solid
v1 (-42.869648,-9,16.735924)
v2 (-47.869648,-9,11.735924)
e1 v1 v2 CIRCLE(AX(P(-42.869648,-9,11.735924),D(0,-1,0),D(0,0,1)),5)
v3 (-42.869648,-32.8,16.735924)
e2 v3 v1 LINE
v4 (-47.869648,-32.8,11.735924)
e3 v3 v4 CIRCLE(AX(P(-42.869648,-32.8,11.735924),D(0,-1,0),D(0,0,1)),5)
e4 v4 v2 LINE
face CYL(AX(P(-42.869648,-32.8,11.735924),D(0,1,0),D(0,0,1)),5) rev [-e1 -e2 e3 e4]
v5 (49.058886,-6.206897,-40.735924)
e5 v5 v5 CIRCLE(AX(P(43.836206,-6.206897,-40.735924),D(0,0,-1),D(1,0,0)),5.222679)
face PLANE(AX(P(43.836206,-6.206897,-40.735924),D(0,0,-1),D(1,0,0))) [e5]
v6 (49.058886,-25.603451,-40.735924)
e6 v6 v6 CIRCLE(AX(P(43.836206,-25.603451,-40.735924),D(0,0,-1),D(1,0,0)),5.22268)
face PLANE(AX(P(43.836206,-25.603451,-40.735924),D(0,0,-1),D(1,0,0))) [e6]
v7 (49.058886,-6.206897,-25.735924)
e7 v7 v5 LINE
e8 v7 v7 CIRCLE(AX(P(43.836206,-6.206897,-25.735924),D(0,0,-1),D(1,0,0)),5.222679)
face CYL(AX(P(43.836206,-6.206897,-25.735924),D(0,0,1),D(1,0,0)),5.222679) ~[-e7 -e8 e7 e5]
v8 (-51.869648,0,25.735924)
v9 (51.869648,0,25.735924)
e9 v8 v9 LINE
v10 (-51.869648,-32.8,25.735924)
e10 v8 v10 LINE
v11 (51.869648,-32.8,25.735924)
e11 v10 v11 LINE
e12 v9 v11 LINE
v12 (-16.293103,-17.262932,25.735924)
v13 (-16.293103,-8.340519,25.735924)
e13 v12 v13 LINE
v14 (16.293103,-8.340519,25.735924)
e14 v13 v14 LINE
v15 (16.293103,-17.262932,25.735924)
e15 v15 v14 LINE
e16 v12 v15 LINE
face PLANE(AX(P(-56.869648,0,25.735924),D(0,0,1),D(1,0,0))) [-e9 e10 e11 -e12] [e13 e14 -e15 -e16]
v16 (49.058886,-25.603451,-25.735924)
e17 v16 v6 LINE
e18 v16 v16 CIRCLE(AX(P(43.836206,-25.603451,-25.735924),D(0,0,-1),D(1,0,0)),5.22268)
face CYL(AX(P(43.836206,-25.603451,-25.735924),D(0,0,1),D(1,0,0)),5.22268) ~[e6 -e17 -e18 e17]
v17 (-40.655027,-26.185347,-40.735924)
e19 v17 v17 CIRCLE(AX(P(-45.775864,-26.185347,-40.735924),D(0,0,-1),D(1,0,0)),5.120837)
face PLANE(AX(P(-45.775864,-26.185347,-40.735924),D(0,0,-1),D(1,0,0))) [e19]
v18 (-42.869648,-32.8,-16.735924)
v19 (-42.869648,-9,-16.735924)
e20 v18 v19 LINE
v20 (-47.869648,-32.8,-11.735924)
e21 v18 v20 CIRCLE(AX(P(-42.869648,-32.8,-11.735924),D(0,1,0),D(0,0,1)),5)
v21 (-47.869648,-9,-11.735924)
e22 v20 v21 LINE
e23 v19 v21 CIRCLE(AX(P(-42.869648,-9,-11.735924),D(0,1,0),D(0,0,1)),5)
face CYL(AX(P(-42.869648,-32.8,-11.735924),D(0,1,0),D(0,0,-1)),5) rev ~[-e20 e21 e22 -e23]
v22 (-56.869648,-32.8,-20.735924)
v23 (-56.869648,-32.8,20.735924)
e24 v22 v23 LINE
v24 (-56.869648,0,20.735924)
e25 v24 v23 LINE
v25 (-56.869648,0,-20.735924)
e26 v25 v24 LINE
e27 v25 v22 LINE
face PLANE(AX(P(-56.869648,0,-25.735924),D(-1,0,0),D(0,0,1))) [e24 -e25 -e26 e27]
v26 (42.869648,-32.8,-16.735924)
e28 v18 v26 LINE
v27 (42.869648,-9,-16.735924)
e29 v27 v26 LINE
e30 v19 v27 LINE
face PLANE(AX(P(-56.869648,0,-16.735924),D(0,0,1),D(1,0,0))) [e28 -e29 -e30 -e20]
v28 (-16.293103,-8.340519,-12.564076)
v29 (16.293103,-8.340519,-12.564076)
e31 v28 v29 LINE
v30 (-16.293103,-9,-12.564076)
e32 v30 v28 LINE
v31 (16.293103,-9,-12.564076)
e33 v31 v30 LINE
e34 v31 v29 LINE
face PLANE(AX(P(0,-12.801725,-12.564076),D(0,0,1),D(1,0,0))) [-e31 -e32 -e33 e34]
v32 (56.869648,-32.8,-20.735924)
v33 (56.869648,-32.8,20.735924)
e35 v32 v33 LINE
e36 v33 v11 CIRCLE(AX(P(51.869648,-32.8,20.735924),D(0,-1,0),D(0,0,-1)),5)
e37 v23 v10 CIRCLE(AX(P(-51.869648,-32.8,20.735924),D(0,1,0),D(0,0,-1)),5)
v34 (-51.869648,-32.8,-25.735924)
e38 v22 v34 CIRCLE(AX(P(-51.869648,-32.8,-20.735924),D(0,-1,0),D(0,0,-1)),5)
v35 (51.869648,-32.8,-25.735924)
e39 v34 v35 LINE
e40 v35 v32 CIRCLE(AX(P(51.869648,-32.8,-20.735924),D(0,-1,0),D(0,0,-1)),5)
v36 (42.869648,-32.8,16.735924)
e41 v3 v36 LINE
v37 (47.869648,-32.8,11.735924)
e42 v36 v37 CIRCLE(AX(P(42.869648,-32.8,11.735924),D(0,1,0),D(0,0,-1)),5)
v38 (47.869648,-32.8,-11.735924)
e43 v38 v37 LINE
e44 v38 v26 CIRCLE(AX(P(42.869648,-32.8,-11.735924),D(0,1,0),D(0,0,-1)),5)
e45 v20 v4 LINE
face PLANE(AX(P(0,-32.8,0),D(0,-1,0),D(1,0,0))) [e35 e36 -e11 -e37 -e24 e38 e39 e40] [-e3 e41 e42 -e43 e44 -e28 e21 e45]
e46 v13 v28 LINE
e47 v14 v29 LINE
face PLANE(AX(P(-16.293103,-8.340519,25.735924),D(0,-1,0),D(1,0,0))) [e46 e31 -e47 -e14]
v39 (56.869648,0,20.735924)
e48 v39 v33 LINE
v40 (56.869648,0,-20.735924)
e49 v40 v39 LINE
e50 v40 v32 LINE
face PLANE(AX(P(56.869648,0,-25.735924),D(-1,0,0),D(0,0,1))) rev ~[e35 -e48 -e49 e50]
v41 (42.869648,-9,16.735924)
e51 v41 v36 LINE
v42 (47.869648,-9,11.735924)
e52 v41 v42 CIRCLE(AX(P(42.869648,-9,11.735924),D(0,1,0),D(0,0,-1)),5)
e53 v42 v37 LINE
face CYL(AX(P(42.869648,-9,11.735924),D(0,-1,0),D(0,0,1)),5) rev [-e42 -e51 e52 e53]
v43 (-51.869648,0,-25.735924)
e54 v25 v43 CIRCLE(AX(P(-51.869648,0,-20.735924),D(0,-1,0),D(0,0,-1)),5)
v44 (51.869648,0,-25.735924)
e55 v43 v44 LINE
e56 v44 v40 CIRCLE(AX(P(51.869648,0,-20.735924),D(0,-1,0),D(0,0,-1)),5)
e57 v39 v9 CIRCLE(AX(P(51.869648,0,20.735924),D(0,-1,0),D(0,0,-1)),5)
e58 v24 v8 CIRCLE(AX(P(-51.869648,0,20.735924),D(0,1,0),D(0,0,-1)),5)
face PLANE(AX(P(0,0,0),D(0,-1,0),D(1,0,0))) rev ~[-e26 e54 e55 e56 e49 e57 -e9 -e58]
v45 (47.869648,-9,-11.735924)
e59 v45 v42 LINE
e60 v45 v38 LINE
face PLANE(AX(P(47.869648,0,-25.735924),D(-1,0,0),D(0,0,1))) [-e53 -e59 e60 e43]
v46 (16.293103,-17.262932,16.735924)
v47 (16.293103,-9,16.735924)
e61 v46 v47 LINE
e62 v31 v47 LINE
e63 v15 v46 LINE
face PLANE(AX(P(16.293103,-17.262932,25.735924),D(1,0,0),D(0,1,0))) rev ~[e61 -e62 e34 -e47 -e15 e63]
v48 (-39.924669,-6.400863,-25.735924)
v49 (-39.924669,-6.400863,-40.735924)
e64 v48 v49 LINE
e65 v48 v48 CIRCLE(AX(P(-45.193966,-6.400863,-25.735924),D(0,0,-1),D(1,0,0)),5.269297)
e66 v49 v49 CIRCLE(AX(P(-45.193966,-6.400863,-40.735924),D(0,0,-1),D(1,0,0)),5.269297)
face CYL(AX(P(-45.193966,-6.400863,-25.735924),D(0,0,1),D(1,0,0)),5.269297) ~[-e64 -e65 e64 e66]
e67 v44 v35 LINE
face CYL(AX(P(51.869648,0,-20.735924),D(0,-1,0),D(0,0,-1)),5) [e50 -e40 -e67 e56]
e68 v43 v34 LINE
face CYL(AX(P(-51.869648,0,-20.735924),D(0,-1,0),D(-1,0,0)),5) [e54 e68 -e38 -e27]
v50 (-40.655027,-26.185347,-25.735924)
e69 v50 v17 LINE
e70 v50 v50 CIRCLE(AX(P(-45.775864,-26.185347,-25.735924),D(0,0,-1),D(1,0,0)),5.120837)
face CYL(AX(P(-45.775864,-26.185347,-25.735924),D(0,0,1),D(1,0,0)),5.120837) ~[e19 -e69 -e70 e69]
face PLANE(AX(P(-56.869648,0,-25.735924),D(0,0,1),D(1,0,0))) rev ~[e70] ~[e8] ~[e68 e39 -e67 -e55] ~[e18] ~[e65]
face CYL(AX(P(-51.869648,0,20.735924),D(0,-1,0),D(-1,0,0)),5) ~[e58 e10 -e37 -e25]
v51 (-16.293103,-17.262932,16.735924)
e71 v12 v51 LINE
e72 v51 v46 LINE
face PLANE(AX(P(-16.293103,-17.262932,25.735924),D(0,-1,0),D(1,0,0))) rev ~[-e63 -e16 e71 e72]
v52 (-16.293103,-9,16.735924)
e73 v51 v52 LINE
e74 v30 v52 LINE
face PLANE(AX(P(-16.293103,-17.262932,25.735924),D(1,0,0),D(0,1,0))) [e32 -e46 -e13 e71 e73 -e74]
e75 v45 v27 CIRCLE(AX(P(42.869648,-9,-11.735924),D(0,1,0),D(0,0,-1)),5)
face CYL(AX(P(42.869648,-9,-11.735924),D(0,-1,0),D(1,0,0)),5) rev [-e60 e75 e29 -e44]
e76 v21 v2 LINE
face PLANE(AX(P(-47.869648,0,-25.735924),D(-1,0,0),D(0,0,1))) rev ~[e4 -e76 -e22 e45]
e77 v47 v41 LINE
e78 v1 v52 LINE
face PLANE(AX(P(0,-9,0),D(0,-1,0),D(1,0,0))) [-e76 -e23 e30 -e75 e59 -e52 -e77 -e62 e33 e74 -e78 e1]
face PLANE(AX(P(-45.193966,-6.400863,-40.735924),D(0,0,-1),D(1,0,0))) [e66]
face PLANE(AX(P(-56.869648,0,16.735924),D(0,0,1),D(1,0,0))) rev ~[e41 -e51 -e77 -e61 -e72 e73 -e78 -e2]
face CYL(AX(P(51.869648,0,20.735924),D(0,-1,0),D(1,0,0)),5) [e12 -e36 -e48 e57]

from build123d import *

# Parameters (mm, degrees)
F0_W     = 113.7392967939
F0_H     = 51.4718480408
F1_DEPTH = 32.8
F2_R     = 5
F3_T     = -9
F4_W     = 32.5862057507
F4_H     = 8.9224129915
F5_DEPTH = 38.3
F6_R     = 5
F7_R     = 5.2692974362
F7_R_2   = 5.120837474
F7_R_3   = 5.2226793455
F7_R_4   = 5.2226798643
F8_DEPTH = 15


with BuildPart() as f1:
    # F0 (on Front) → F1 (new body)
    with BuildSketch(Plane.XZ):
        Rectangle(F0_W, F0_H)
    extrude(amount=F1_DEPTH)

    # F2
    f2_edges = [f1.edges().sort_by_distance(p)[0] for p in [
        (56.869648, -16.4, 25.735924),
        (56.869648, -16.4, -25.735924),
        (-56.869648, -16.4, -25.735924),
        (-56.869648, -16.4, 25.735924),
    ]]
    fillet(f2_edges, radius=F2_R)

    # F3
    f3_openings = [f1.faces().sort_by_distance(p)[0] for p in [
        (0, -32.8, 0),
    ]]
    offset(amount=F3_T, openings=f3_openings)

    # F4 (on face) → F5 (cut)
    with BuildSketch(Plane.XY.offset(25.7359240204)):
        with Locations((0, -12.8017254174)):
            Rectangle(F4_W, F4_H)
    extrude(amount=-F5_DEPTH, mode=Mode.SUBTRACT)

    # F6
    f6_edges = [f1.edges().sort_by_distance(p)[0] for p in [
        (47.869648, -20.9, -16.735924),
        (-47.869648, -20.9, -16.735924),
        (-47.869648, -20.9, 16.735924),
        (47.869648, -20.9, 16.735924),
    ]]
    fillet(f6_edges, radius=F6_R)

    # F7 (on face) → F8 (join)
    with BuildSketch(Plane(origin=(0, 0, -25.7359240204), x_dir=(1, 0, 0), z_dir=(0, 0, -1))):
        with Locations((-45.1939664781, 6.4008627087)):
            Circle(F7_R)
        with Locations((-45.7758642733, 26.1853467673)):
            Circle(F7_R_2)
        with Locations((43.8362061977, 6.2068966217)):
            Circle(F7_R_3)
        with Locations((43.8362061977, 25.6034508348)):
            Circle(F7_R_4)
    extrude(amount=F8_DEPTH)


solid = f1.part
